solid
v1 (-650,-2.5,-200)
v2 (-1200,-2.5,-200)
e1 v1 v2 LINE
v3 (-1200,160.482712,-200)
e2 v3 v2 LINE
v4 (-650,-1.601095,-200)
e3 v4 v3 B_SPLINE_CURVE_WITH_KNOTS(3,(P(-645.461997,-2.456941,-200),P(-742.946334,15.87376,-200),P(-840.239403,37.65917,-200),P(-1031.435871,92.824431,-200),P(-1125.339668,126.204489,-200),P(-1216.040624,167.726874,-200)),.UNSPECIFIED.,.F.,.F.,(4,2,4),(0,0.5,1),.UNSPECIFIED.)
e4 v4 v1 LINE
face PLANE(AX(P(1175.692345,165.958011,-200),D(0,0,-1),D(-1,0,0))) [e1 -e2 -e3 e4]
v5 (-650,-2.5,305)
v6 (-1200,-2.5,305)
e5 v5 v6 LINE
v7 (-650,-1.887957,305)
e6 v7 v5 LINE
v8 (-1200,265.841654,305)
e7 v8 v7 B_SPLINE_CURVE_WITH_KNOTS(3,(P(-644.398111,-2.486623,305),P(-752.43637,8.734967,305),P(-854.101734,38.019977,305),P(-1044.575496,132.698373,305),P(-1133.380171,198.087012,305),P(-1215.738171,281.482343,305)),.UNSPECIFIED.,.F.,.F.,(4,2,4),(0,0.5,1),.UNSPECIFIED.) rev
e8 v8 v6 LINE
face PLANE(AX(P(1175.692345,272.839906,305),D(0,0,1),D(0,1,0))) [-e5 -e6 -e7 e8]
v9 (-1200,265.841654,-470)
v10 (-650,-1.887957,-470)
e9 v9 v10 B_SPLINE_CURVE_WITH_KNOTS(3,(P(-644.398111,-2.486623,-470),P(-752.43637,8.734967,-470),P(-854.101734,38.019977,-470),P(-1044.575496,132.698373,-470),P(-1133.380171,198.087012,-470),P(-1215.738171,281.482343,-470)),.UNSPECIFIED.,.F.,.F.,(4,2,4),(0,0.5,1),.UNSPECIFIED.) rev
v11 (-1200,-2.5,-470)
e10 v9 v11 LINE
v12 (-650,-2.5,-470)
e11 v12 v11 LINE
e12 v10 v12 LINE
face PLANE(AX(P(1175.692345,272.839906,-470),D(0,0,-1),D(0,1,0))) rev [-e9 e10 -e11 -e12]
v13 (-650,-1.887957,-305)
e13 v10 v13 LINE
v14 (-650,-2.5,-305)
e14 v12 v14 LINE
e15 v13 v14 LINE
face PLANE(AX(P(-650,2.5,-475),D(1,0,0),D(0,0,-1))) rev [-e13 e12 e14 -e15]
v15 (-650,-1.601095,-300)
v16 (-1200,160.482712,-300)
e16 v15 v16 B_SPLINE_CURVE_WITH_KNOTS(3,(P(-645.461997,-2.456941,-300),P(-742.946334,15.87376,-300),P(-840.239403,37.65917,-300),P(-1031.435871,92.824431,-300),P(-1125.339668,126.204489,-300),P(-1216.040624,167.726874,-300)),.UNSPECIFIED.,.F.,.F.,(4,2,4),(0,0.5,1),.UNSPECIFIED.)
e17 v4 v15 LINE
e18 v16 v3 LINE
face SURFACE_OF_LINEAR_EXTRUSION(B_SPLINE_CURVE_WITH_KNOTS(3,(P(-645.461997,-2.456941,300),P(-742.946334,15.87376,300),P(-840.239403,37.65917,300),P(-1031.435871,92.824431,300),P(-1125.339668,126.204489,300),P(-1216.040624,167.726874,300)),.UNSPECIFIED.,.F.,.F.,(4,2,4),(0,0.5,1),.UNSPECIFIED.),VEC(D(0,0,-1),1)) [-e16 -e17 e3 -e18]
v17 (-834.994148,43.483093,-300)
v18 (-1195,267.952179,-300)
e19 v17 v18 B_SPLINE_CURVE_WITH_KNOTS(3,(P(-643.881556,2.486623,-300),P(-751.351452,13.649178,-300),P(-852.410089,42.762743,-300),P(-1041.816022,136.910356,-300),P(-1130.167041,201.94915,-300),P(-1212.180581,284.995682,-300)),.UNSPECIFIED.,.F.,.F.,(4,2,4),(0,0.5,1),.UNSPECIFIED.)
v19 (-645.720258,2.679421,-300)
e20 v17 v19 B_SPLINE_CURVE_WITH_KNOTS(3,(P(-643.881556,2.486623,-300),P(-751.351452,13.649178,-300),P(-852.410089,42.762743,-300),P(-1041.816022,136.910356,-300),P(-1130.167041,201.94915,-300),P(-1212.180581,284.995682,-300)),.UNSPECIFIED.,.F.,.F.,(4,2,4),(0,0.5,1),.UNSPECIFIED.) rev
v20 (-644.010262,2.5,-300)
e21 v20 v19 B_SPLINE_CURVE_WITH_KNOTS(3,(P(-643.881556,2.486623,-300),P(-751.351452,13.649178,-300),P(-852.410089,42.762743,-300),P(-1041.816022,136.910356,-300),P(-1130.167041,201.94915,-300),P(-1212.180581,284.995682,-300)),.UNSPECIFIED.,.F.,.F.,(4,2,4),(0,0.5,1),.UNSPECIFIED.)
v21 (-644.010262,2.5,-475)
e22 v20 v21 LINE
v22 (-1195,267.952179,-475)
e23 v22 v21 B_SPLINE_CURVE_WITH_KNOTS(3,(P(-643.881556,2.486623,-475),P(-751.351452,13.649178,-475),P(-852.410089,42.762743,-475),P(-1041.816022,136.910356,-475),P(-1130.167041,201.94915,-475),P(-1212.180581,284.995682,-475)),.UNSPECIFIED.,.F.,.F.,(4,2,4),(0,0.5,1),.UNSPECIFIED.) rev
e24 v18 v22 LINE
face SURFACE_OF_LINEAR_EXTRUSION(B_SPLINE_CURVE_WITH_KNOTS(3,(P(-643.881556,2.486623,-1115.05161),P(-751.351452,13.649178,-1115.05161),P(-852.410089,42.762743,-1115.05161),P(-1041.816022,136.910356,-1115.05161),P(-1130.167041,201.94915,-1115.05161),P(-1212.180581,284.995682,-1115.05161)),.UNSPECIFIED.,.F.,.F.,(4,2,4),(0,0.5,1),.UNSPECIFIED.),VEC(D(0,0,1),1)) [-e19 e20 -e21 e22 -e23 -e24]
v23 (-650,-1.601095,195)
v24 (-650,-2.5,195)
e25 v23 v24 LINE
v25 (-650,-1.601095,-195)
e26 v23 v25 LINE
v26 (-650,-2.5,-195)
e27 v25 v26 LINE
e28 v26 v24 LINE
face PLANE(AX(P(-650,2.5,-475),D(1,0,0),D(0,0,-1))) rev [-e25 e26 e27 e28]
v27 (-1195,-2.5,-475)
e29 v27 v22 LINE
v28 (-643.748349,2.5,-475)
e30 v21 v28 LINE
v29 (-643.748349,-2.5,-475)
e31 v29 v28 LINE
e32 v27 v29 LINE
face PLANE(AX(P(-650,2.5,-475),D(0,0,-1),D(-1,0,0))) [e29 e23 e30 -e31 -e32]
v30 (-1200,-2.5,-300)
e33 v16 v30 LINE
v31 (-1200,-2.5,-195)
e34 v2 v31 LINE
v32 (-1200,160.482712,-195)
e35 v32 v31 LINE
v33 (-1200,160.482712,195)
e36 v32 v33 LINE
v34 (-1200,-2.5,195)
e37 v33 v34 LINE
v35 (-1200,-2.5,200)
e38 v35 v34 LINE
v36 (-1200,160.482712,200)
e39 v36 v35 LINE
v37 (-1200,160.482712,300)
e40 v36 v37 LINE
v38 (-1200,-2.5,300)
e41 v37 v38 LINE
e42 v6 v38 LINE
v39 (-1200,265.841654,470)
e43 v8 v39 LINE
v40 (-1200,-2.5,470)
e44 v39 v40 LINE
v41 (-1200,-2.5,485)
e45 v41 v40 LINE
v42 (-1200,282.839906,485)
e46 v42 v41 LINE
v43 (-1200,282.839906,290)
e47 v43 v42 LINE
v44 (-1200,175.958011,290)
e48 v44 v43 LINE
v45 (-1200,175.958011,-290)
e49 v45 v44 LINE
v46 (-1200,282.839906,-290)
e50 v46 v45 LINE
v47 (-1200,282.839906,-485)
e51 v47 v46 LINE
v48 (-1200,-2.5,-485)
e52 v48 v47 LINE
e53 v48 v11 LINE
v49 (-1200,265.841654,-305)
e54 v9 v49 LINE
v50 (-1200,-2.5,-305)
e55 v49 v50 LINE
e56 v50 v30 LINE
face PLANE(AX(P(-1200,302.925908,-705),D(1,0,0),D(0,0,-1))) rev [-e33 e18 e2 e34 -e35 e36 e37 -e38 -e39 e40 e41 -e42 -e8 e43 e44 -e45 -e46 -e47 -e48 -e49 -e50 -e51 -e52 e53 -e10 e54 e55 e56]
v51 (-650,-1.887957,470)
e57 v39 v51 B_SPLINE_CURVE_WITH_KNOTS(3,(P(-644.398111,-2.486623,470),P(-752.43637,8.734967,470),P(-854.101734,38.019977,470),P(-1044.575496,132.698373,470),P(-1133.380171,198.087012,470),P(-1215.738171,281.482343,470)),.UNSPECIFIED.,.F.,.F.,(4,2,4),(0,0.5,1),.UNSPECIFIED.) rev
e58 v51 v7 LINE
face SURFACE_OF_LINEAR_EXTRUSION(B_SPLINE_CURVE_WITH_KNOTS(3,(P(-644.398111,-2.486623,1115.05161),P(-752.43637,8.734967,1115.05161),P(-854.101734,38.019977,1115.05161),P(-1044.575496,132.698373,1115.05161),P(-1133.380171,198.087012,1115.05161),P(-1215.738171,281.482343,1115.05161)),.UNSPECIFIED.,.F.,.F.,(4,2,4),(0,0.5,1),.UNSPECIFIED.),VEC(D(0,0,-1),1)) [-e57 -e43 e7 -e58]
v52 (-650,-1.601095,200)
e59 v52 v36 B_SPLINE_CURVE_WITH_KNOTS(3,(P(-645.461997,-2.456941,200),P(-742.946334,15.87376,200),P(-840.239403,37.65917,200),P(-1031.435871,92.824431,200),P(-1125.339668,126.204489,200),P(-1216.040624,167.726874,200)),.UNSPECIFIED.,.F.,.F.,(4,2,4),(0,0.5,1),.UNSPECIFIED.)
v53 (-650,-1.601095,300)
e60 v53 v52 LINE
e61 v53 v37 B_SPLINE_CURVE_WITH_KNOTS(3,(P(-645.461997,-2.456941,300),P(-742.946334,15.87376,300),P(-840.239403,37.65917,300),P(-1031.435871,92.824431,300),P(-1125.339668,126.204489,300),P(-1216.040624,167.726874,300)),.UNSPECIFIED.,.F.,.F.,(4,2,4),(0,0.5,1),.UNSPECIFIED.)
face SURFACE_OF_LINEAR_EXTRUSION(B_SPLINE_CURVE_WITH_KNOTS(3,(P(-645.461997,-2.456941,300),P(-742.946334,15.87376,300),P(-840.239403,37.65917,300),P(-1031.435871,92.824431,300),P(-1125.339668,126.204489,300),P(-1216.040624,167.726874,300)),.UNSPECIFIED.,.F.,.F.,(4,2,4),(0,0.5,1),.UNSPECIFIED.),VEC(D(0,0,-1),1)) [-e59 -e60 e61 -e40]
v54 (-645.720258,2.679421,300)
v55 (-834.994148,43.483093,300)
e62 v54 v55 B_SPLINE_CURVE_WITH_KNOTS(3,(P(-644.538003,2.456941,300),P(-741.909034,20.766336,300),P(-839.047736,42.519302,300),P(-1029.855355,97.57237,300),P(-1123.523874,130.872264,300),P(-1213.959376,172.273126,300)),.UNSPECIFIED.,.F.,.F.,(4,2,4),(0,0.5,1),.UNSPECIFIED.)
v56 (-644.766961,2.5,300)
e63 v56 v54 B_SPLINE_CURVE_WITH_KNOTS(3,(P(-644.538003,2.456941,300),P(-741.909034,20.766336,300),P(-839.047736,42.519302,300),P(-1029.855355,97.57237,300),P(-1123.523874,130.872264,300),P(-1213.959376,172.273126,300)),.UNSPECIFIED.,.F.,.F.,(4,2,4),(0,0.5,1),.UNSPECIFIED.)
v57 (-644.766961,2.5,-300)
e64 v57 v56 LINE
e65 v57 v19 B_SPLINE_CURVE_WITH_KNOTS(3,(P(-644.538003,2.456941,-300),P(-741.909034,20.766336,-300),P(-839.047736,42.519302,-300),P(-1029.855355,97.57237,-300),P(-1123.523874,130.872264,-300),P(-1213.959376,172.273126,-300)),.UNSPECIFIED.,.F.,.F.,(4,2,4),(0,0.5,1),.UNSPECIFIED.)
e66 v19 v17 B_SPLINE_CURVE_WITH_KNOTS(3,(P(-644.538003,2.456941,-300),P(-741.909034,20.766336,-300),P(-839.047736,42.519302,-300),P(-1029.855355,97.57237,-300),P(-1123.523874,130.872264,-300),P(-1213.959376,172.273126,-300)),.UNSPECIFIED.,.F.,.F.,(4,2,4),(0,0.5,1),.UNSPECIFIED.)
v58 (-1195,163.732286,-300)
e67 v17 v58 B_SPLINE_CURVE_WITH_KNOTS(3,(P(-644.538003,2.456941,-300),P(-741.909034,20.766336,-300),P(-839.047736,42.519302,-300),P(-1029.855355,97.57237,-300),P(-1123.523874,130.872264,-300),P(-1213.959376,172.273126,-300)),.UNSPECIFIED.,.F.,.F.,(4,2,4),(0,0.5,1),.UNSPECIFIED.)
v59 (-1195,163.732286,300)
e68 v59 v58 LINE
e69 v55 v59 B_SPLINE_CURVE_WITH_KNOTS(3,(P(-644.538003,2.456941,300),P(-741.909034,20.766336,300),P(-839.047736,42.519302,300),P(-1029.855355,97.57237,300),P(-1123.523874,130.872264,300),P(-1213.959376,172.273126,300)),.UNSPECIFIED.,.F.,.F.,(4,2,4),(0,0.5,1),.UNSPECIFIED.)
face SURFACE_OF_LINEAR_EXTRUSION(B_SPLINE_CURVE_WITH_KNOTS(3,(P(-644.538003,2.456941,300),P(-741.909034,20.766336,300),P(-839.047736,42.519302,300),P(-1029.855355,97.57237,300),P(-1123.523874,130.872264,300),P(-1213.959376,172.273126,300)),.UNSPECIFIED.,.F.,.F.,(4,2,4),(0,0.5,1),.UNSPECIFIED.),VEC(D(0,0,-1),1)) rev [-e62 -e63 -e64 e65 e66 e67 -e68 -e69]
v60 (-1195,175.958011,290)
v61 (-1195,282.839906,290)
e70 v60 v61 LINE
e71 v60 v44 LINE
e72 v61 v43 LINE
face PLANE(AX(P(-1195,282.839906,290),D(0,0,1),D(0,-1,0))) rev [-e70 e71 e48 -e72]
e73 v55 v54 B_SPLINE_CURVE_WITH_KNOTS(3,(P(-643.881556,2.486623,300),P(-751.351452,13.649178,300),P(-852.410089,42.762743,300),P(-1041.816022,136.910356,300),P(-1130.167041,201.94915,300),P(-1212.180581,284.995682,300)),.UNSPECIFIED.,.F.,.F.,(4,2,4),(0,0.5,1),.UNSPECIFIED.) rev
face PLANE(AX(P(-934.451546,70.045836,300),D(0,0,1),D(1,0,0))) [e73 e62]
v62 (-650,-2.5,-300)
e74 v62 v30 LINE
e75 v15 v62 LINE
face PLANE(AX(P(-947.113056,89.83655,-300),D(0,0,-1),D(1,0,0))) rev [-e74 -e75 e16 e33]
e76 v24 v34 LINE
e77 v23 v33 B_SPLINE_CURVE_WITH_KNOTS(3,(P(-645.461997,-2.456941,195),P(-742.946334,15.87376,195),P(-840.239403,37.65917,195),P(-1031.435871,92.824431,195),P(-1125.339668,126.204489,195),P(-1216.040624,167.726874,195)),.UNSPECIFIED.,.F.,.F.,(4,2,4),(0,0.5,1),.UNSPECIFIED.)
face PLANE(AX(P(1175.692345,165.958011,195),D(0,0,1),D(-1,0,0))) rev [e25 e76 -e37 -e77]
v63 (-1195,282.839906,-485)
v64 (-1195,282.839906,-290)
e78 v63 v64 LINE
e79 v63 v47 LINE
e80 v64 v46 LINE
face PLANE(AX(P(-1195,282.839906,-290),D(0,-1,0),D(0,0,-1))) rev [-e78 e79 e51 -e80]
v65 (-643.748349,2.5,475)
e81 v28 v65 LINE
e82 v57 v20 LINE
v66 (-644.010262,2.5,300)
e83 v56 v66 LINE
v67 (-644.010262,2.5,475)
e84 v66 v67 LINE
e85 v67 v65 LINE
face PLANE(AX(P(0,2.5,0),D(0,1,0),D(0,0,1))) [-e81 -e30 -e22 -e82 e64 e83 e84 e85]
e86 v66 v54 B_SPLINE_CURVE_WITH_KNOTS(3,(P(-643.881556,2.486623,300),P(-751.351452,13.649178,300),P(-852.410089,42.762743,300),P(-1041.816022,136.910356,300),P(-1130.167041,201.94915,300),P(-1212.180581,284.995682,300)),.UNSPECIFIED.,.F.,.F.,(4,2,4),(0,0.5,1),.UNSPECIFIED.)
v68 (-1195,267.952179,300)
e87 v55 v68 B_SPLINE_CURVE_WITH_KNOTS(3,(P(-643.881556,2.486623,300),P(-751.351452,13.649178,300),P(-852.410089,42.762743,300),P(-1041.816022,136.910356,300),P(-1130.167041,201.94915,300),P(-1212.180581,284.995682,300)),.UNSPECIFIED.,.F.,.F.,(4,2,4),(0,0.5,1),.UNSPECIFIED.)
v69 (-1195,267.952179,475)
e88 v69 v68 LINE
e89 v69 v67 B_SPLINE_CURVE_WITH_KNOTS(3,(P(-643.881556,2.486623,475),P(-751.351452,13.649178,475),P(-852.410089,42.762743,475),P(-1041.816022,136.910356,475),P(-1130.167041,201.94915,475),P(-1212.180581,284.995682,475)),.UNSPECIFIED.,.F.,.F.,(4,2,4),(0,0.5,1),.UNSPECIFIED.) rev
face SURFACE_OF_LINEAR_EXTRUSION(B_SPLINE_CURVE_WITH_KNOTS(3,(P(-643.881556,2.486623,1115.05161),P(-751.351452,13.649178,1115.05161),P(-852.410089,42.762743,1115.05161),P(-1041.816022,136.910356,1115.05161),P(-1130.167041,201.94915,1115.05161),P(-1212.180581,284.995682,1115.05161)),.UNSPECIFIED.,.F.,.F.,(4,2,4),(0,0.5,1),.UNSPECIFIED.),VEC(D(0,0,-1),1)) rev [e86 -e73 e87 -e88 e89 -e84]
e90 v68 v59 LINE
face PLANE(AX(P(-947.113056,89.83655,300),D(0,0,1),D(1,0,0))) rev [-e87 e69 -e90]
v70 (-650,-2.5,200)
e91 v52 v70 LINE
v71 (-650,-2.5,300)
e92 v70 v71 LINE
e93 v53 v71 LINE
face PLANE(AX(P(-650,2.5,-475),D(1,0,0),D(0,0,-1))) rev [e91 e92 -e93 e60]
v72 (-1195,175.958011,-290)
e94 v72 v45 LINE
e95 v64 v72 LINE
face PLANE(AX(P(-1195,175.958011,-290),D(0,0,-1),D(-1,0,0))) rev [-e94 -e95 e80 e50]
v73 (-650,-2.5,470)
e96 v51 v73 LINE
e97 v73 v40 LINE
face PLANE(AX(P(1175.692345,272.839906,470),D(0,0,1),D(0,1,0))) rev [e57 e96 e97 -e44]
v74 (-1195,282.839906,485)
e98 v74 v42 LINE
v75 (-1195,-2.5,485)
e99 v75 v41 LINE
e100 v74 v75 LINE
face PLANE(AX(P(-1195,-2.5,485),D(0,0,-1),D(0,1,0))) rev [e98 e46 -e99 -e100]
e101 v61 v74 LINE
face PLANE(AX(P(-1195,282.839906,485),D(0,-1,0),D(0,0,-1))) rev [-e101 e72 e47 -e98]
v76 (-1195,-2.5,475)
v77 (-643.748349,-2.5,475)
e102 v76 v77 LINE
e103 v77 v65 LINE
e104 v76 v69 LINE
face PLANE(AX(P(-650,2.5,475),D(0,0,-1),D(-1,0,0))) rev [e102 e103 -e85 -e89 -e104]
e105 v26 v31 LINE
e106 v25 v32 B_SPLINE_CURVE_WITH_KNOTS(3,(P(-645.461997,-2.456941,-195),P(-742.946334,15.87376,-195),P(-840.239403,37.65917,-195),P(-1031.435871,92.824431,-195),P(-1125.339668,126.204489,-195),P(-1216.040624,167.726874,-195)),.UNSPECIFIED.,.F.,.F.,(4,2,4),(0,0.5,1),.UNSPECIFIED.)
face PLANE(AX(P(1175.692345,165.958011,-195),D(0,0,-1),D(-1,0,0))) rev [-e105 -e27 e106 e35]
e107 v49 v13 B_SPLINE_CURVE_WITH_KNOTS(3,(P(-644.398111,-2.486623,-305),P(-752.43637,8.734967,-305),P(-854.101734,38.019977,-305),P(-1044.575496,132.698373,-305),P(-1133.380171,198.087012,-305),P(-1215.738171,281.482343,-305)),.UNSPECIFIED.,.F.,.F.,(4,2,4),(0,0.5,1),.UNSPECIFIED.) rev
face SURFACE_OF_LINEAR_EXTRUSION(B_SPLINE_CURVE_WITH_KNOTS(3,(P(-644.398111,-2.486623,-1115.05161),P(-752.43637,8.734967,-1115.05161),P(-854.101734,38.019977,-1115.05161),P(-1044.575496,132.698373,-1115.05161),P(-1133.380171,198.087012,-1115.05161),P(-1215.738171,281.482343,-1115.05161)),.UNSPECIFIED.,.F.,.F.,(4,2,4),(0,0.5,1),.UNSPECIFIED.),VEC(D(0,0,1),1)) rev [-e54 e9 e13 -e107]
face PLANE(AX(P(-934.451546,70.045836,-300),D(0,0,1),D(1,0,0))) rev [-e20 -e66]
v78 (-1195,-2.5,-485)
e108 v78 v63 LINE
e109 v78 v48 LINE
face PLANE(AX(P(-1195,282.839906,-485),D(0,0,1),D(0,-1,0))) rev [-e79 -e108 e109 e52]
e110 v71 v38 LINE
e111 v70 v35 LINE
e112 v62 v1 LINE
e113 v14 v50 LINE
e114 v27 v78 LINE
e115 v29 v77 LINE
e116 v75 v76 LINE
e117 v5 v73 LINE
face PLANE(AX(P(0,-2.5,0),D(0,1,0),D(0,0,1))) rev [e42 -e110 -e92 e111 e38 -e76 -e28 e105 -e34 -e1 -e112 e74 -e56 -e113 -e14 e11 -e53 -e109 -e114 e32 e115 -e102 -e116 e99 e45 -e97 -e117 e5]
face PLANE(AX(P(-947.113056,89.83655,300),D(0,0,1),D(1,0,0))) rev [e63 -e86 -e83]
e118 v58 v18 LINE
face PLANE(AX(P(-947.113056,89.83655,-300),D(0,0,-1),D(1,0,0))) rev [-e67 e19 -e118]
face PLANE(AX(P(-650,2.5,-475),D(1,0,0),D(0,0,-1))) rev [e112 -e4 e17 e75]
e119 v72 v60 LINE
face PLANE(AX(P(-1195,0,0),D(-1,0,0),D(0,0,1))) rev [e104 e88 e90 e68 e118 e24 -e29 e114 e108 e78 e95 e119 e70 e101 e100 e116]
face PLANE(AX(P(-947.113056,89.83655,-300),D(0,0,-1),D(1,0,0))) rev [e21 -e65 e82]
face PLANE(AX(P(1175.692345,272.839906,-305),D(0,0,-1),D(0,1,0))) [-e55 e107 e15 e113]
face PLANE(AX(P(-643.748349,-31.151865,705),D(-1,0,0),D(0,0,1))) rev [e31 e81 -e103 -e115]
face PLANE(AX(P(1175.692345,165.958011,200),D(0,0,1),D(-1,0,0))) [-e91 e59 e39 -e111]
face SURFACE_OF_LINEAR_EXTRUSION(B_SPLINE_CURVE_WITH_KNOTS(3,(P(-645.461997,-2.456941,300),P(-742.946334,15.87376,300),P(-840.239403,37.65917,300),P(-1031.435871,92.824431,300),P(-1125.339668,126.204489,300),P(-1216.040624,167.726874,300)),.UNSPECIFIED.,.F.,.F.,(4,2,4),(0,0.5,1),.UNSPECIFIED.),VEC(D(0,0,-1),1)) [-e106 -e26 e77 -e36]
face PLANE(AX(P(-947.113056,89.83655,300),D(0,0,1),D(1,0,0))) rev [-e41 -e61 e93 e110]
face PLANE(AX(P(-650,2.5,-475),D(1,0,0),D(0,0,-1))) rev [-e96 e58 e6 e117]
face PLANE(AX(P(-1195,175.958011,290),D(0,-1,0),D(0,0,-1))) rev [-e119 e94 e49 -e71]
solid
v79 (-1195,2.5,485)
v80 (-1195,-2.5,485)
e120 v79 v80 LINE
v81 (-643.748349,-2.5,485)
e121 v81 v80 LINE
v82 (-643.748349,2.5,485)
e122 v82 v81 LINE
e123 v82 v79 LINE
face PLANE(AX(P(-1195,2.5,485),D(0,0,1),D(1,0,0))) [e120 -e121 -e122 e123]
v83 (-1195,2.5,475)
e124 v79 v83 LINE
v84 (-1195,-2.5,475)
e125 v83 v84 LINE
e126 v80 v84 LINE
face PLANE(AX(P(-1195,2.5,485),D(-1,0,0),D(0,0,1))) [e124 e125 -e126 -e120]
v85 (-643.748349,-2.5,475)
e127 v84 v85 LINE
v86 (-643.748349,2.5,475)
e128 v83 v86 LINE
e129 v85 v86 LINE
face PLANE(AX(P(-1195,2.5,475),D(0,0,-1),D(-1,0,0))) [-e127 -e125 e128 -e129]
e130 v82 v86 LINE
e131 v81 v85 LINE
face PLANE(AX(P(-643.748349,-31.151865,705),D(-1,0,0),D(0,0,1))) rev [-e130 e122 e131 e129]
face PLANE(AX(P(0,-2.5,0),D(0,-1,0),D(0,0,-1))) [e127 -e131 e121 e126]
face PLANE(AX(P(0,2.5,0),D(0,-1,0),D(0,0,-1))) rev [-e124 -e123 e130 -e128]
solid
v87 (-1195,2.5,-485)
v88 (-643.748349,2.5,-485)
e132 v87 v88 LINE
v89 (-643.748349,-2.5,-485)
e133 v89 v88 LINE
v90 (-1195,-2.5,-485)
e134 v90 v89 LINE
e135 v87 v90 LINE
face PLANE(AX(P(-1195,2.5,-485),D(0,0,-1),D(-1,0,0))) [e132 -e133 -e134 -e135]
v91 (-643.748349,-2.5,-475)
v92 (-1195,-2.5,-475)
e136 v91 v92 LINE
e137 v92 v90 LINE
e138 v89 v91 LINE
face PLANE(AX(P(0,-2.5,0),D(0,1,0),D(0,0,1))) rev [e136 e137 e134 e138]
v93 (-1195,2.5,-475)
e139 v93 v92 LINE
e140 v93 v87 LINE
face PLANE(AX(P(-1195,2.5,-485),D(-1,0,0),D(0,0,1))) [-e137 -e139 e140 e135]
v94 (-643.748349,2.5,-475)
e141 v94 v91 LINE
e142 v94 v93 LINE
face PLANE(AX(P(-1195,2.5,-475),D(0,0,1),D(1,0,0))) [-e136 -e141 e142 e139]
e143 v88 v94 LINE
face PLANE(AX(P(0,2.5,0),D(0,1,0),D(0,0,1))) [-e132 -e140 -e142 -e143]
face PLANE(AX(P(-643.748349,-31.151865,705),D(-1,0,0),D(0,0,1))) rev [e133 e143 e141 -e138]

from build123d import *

# Parameters (mm, degrees)
BOSS_EXTRUDE2_DEPTH     = 2.5
EXTRUDE_THIN3_DEPTH     = 235
SKETCH4_W               = 1042.927071657
SKETCH4_H               = 5
BOSS_EXTRUDE3_DEPTH     = 7.5
EXTRUDE_THIN11_START    = -300
EXTRUDE_THIN11_DEPTH    = 600
EXTRUDE_THIN12_DEPTH    = 175
CUT_EXTRUDE1_DEPTH      = 1604.122683576
CUT_EXTRUDE1_DEPTH_BACK = 1604.122683576
SKETCH18_W              = 179.246865424
SKETCH18_H              = 302.92590826
EXTRUDE_THIN13_REACH    = 2495.065
SKETCH19_W              = 5
SKETCH19_H              = 275.339906304
EXTRUDE_THIN14_REACH    = 2495.065
SKETCH20_W              = 5
SKETCH20_H              = 275.339906304
EXTRUDE_THIN16_REACH    = 2495.065
SKETCH22_W              = 5
SKETCH22_H              = 168.458010872
FILLET1_R               = 20
SKETCH23_W              = 3.72541272
SKETCH23_H              = 6.292080427
SKETCH23_W_2            = 358.835343645
SKETCH23_H_2            = 131.046016594
CUT_EXTRUDE4_DEPTH      = 761
BOSS_EXTRUDE4_DEPTH     = 5
SKETCH27_W              = 715
SKETCH27_H              = 10
BOSS_EXTRUDE5_DEPTH     = 5
BOSS_EXTRUDE5_2_DEPTH   = 5
CUT_EXTRUDE5_DEPTH      = 1707.575053402
CUT_EXTRUDE5_DEPTH_BACK = 1707.575053402
SKETCH28_W              = 1486.694055837
SKETCH28_H              = 126.536927381


# Read off the part's stored shape, not the designer's step: Extrude-Thin11, Extrude-Thin12
with BuildPart() as part:
    # Sketch1 → Boss-Extrude2 (new, symmetric)
    with BuildSketch(Plane(origin=(0, 0, 0), x_dir=(1, 0, 0), z_dir=(0, 1, 0))):
        Polygon((480, 700), (-480, 700), (-480, 475), (-650, 475), (-650, -475), (-480, -475), (-480, -700), (480, -700), (480, -235), (827.5, -235), (827.5, 235), (480, 235), align=None)
    extrude(amount=BOSS_EXTRUDE2_DEPTH, both=True)

    # Sketch3 → Extrude-Thin3 (add, symmetric)
    with BuildSketch(Plane.XY):
        Polygon((1174.309655256, 102.402795067), (826.252385714, 2.402795067), (827.633075202, -2.402795067), (1175.690344744, 97.597204933), align=None)
    extrude(amount=EXTRUDE_THIN3_DEPTH, both=True)

    # Sketch4 → Boss-Extrude3 (add, symmetric)
    with BuildSketch(Plane(origin=(0, 0, 0), x_dir=(1, 0, 0), z_dir=(0, 1, 0))):
        with Locations((-8.495865184, 702.5)):
            Rectangle(SKETCH4_W, SKETCH4_H)
        with Locations((-8.495865184, -702.5)):
            Rectangle(SKETCH4_W, SKETCH4_H)
    extrude(amount=BOSS_EXTRUDE3_DEPTH, both=True)

    # Extrude-Thin11 outline → Extrude-Thin11 (add)
    with BuildSketch(Plane.XY.offset(EXTRUDE_THIN11_START)):
        with BuildLine():
            add(Edge.make_bspline(
                [(-650, -1.601095272), (-745.965421623, 16.551267125), (-841.722851264, 38.087184635), (-1031.435871365, 92.824431487), (-1125.339668468, 126.204489075), (-1216.040624187, 167.726874112)],
                knots=[0.007758763, 0.007758763, 0.007758763, 0.007758763, 0.5, 0.5, 1, 1, 1, 1], degree=3))
            Line((-650, -1.601095272), (-650, 2.5))
            Line((-650, 2.5), (-644.76696083, 2.5))
            add(Edge.make_bspline(
                [(-644.76696083, 2.5), (-742.06130715, 20.800439318), (-839.122513562, 42.540877144), (-1029.855355166, 97.572369595), (-1123.52387399, 130.872264144), (-1213.959375813, 172.273125888)],
                knots=[0.0003919, 0.0003919, 0.0003919, 0.0003919, 0.5, 0.5, 1, 1, 1, 1], degree=3))
            Line((-1213.959375813, 172.273125888), (-1216.040624187, 167.726874112))
        make_face()
    extrude(amount=EXTRUDE_THIN11_DEPTH)

    # Extrude-Thin12 outline → Extrude-Thin12 (add)
    with BuildSketch(Plane.XY.offset(300)):
        with BuildLine():
            add(Edge.make_bspline(
                [(-650, -1.887956912), (-714.399871829, 5.188072449), (-776.525735795, 18.708551477), (-836.365745858, 38.671512781)],
                knots=[0.008650658, 0.008650658, 0.008650658, 0.008650658, 0.307302261, 0.307302261, 0.307302261, 0.307302261], degree=3))
            Line((-650, -1.887956912), (-650, -1.601095272))
            add(Edge.make_bspline(
                [(-650, -1.601095272), (-712.340786915, 10.190991264), (-774.593800697, 23.410946466), (-836.365745858, 38.671512781)],
                knots=[0.007758763, 0.007758763, 0.007758763, 0.007758763, 0.327527129, 0.327527129, 0.327527129, 0.327527129], degree=3))
        make_face()
        with BuildLine():
            add(Edge.make_bspline(
                [(-836.365745858, 38.671512781), (-852.25304535, 43.971604553), (-867.979218957, 49.725815753), (-883.544044986, 55.934109562)],
                knots=[0.307302261, 0.307302261, 0.307302261, 0.307302261, 0.386593148, 0.386593148, 0.386593148, 0.386593148], degree=3))
            add(Edge.make_bspline(
                [(-650, -1.601095272), (-712.340786915, 10.190991264), (-774.593800697, 23.410946466), (-836.365745858, 38.671512781)],
                knots=[0.007758763, 0.007758763, 0.007758763, 0.007758763, 0.327527129, 0.327527129, 0.327527129, 0.327527129], degree=3))
            Line((-650, -1.601095272), (-650, 2.5))
            Line((-650, 2.5), (-644.76696083, 2.5))
            add(Edge.make_bspline(
                [(-644.76696083, 2.5), (-645.084729042, 2.559770152), (-645.402494767, 2.619576999), (-645.720257953, 2.679420622)],
                knots=[0.0003919, 0.0003919, 0.0003919, 0.0003919, 0.002023645, 0.002023645, 0.002023645, 0.002023645], degree=3))
            add(Edge.make_bspline(
                [(-645.720257953, 2.679420622), (-711.189774451, 9.609021002), (-774.276873408, 23.209547974), (-834.994147924, 43.483093002)],
                knots=[0.00285247, 0.00285247, 0.00285247, 0.00285247, 0.307654611, 0.307654611, 0.307654611, 0.307654611], degree=3))
            add(Edge.make_bspline(
                [(-834.994147924, 43.483093002), (-851.214231644, 47.489142042), (-867.399914765, 51.63578392), (-883.544044986, 55.934109562)],
                knots=[0.327229198, 0.327229198, 0.327229198, 0.327229198, 0.411337881, 0.411337881, 0.411337881, 0.411337881], degree=3))
        make_face()
        with BuildLine():
            add(Edge.make_bspline(
                [(-883.544044986, 55.934109562), (-905.805845785, 64.813604895), (-927.737585371, 74.621995841), (-1044.575495941, 132.698372544), (-1133.380170751, 198.087011734), (-1215.738171114, 281.482343019)],
                knots=[0.386593148, 0.386593148, 0.386593148, 0.386593148, 0.5, 0.5, 1, 1, 1, 1], degree=3))
            add(Edge.make_bspline(
                [(-834.994147924, 43.483093002), (-851.214231644, 47.489142042), (-867.399914765, 51.63578392), (-883.544044986, 55.934109562)],
                knots=[0.327229198, 0.327229198, 0.327229198, 0.327229198, 0.411337881, 0.411337881, 0.411337881, 0.411337881], degree=3))
            add(Edge.make_bspline(
                [(-834.994147924, 43.483093002), (-873.309783501, 56.276713423), (-910.681697892, 71.727690399), (-1041.816022387, 136.910355777), (-1130.167041169, 201.949150116), (-1212.180580511, 284.995681759)],
                knots=[0.307654611, 0.307654611, 0.307654611, 0.307654611, 0.5, 0.5, 1, 1, 1, 1], degree=3))
            Line((-1212.180580511, 284.995681759), (-1215.738171114, 281.482343019))
        make_face()
        with BuildLine():
            add(Edge.make_bspline(
                [(-644.76696083, 2.5), (-645.084729042, 2.559770152), (-645.402494767, 2.619576999), (-645.720257953, 2.679420622)],
                knots=[0.0003919, 0.0003919, 0.0003919, 0.0003919, 0.002023645, 0.002023645, 0.002023645, 0.002023645], degree=3))
            Line((-644.76696083, 2.5), (-644.010262456, 2.5))
            add(Edge.make_bspline(
                [(-644.010262456, 2.5), (-644.580441434, 2.559301539), (-645.15043993, 2.619108412), (-645.720257953, 2.679420622)],
                knots=[0.000199606, 0.000199606, 0.000199606, 0.000199606, 0.00285247, 0.00285247, 0.00285247, 0.00285247], degree=3))
        make_face()
    extrude(amount=EXTRUDE_THIN12_DEPTH)

    # Mirror2: part across plane


with BuildPart() as part_1:
    add(part.part)
    add(part.part.mirror(Plane.XY))

    # Sketch18 → Cut-Extrude1 (cut, two sides: drawn at the far end of the back side and taken through both)
    with BuildSketch(Plane.XY.offset(300).offset(-CUT_EXTRUDE1_DEPTH_BACK)):
        with Locations((-1289.623432712, 151.46295413)):
            Rectangle(SKETCH18_W, SKETCH18_H)
    extrude(amount=CUT_EXTRUDE1_DEPTH + CUT_EXTRUDE1_DEPTH_BACK, mode=Mode.SUBTRACT)

    # Sketch19 → Extrude-Thin13 (add, up to next)
    with BuildSketch(Plane(origin=(-1200, 0, 0), x_dir=(0, 0, -1), z_dir=(1, 0, 0)), mode=Mode.PRIVATE) as extrude_thin13_sk1:
        with Locations((472.5, 135.169953152)):
            Rectangle(SKETCH19_W, SKETCH19_H)
    extrude_thin13_tool1 = extrude(extrude_thin13_sk1.sketch, amount=EXTRUDE_THIN13_REACH, mode=Mode.PRIVATE) - part_1.part
    add(extrude_thin13_tool1.solids().sort_by_distance((-1200, 135.169953, -472.5))[0])

    # Sketch20 → Extrude-Thin14 (add, up to next)
    with BuildSketch(Plane(origin=(-1200, 0, 0), x_dir=(0, 0, -1), z_dir=(1, 0, 0)), mode=Mode.PRIVATE) as extrude_thin14_sk1:
        with Locations((302.5, 135.169953152)):
            Rectangle(SKETCH20_W, SKETCH20_H)
    extrude_thin14_tool1 = extrude(extrude_thin14_sk1.sketch, amount=EXTRUDE_THIN14_REACH, mode=Mode.PRIVATE) - part_1.part
    add(extrude_thin14_tool1.solids().sort_by_distance((-1200, 135.169953, -302.5))[0])

    # Sketch22 → Extrude-Thin16 (add, up to next)
    with BuildSketch(Plane(origin=(-1200, 0, 0), x_dir=(0, 0, -1), z_dir=(1, 0, 0)), mode=Mode.PRIVATE) as extrude_thin16_sk1:
        with Locations((197.5, 81.729005436)):
            Rectangle(SKETCH22_W, SKETCH22_H)
    extrude_thin16_tool1 = extrude(extrude_thin16_sk1.sketch, amount=EXTRUDE_THIN16_REACH, mode=Mode.PRIVATE) - part_1.part
    add(extrude_thin16_tool1.solids().sort_by_distance((-1200, 81.729005, -197.5))[0])

    # Mirror3: part across plane


with BuildPart() as part_2:
    add(part_1.part)
    add(part_1.part.mirror(Plane.XY))

    # Fillet1
    fillet1_edges = [part_2.edges().sort_by_distance(p)[0] for p in [
        (826.59071455, 2.5, 0),
    ]]
    fillet(fillet1_edges, radius=FILLET1_R)

    # Sketch23 → Cut-Extrude4 (cut, symmetric)
    with BuildSketch(Plane.XY):
        with Locations((825.63729364, 0.646040214)):
            Rectangle(SKETCH23_W, SKETCH23_H)
        with Locations((1006.917671822, 63.023008297)):
            Rectangle(SKETCH23_W_2, SKETCH23_H_2)
    extrude(amount=CUT_EXTRUDE4_DEPTH, both=True, mode=Mode.SUBTRACT)

    # Sketch25 → Boss-Extrude4 (add)
    with BuildSketch(Plane(origin=(-1200, 0, 0), x_dir=(0, 0, -1), z_dir=(1, 0, 0))):
        Polygon((485, -2.5), (470, -2.5), (470, 267.839906304), (305, 267.839906304), (305, 160.958010872), (-305, 160.958010872), (-305, 267.839906304), (-470, 267.839906304), (-470, -2.5), (-485, -2.5), (-485, 282.839906304), (-290, 282.839906304), (-290, 175.958010872), (290, 175.958010872), (290, 282.839906304), (485, 282.839906304), align=None)
    extrude(amount=BOSS_EXTRUDE4_DEPTH)


with BuildPart() as body_2:
    # Sketch27 → Boss-Extrude5 (new body)
    with BuildSketch(Plane(origin=(0, -2.5, 0), x_dir=(-1, 0, 0), z_dir=(0, -1, 0))):
        with Locations((837.5, 480)):
            Rectangle(SKETCH27_W, SKETCH27_H)
    extrude(amount=-BOSS_EXTRUDE5_DEPTH)


with BuildPart() as body_3:
    # Sketch27 → Boss-Extrude5 2 (new body)
    with BuildSketch(Plane(origin=(0, -2.5, 0), x_dir=(-1, 0, 0), z_dir=(0, -1, 0))):
        with Locations((837.5, -480)):
            Rectangle(SKETCH27_W, SKETCH27_H)
    extrude(amount=-BOSS_EXTRUDE5_2_DEPTH)


with BuildPart() as cut_extrude5_tool:
    # Sketch28 → Cut-Extrude5 (new, two sides: drawn at the far end of the back side and taken through both)
    with BuildSketch(Plane(origin=(0, 0, -475), x_dir=(-1, 0, 0), z_dir=(0, 0, -1)).offset(-CUT_EXTRUDE5_DEPTH_BACK)):
        with Locations((-99.598679398, 32.116598301)):
            Rectangle(SKETCH28_W, SKETCH28_H)
    extrude(amount=CUT_EXTRUDE5_DEPTH + CUT_EXTRUDE5_DEPTH_BACK)


with BuildPart() as part_3:
    add(part_2.part)

    # Cut-Extrude5: cut by cut_extrude5_tool
    add(cut_extrude5_tool.part, mode=Mode.SUBTRACT)


with BuildPart() as body_2_1:
    add(body_2.part)

    # Cut-Extrude5: cut by cut_extrude5_tool
    add(cut_extrude5_tool.part, mode=Mode.SUBTRACT)


with BuildPart() as body_3_1:
    add(body_3.part)

    # Cut-Extrude5: cut by cut_extrude5_tool
    add(cut_extrude5_tool.part, mode=Mode.SUBTRACT)


solid = Compound([part_3.part, body_2_1.part, body_3_1.part])
